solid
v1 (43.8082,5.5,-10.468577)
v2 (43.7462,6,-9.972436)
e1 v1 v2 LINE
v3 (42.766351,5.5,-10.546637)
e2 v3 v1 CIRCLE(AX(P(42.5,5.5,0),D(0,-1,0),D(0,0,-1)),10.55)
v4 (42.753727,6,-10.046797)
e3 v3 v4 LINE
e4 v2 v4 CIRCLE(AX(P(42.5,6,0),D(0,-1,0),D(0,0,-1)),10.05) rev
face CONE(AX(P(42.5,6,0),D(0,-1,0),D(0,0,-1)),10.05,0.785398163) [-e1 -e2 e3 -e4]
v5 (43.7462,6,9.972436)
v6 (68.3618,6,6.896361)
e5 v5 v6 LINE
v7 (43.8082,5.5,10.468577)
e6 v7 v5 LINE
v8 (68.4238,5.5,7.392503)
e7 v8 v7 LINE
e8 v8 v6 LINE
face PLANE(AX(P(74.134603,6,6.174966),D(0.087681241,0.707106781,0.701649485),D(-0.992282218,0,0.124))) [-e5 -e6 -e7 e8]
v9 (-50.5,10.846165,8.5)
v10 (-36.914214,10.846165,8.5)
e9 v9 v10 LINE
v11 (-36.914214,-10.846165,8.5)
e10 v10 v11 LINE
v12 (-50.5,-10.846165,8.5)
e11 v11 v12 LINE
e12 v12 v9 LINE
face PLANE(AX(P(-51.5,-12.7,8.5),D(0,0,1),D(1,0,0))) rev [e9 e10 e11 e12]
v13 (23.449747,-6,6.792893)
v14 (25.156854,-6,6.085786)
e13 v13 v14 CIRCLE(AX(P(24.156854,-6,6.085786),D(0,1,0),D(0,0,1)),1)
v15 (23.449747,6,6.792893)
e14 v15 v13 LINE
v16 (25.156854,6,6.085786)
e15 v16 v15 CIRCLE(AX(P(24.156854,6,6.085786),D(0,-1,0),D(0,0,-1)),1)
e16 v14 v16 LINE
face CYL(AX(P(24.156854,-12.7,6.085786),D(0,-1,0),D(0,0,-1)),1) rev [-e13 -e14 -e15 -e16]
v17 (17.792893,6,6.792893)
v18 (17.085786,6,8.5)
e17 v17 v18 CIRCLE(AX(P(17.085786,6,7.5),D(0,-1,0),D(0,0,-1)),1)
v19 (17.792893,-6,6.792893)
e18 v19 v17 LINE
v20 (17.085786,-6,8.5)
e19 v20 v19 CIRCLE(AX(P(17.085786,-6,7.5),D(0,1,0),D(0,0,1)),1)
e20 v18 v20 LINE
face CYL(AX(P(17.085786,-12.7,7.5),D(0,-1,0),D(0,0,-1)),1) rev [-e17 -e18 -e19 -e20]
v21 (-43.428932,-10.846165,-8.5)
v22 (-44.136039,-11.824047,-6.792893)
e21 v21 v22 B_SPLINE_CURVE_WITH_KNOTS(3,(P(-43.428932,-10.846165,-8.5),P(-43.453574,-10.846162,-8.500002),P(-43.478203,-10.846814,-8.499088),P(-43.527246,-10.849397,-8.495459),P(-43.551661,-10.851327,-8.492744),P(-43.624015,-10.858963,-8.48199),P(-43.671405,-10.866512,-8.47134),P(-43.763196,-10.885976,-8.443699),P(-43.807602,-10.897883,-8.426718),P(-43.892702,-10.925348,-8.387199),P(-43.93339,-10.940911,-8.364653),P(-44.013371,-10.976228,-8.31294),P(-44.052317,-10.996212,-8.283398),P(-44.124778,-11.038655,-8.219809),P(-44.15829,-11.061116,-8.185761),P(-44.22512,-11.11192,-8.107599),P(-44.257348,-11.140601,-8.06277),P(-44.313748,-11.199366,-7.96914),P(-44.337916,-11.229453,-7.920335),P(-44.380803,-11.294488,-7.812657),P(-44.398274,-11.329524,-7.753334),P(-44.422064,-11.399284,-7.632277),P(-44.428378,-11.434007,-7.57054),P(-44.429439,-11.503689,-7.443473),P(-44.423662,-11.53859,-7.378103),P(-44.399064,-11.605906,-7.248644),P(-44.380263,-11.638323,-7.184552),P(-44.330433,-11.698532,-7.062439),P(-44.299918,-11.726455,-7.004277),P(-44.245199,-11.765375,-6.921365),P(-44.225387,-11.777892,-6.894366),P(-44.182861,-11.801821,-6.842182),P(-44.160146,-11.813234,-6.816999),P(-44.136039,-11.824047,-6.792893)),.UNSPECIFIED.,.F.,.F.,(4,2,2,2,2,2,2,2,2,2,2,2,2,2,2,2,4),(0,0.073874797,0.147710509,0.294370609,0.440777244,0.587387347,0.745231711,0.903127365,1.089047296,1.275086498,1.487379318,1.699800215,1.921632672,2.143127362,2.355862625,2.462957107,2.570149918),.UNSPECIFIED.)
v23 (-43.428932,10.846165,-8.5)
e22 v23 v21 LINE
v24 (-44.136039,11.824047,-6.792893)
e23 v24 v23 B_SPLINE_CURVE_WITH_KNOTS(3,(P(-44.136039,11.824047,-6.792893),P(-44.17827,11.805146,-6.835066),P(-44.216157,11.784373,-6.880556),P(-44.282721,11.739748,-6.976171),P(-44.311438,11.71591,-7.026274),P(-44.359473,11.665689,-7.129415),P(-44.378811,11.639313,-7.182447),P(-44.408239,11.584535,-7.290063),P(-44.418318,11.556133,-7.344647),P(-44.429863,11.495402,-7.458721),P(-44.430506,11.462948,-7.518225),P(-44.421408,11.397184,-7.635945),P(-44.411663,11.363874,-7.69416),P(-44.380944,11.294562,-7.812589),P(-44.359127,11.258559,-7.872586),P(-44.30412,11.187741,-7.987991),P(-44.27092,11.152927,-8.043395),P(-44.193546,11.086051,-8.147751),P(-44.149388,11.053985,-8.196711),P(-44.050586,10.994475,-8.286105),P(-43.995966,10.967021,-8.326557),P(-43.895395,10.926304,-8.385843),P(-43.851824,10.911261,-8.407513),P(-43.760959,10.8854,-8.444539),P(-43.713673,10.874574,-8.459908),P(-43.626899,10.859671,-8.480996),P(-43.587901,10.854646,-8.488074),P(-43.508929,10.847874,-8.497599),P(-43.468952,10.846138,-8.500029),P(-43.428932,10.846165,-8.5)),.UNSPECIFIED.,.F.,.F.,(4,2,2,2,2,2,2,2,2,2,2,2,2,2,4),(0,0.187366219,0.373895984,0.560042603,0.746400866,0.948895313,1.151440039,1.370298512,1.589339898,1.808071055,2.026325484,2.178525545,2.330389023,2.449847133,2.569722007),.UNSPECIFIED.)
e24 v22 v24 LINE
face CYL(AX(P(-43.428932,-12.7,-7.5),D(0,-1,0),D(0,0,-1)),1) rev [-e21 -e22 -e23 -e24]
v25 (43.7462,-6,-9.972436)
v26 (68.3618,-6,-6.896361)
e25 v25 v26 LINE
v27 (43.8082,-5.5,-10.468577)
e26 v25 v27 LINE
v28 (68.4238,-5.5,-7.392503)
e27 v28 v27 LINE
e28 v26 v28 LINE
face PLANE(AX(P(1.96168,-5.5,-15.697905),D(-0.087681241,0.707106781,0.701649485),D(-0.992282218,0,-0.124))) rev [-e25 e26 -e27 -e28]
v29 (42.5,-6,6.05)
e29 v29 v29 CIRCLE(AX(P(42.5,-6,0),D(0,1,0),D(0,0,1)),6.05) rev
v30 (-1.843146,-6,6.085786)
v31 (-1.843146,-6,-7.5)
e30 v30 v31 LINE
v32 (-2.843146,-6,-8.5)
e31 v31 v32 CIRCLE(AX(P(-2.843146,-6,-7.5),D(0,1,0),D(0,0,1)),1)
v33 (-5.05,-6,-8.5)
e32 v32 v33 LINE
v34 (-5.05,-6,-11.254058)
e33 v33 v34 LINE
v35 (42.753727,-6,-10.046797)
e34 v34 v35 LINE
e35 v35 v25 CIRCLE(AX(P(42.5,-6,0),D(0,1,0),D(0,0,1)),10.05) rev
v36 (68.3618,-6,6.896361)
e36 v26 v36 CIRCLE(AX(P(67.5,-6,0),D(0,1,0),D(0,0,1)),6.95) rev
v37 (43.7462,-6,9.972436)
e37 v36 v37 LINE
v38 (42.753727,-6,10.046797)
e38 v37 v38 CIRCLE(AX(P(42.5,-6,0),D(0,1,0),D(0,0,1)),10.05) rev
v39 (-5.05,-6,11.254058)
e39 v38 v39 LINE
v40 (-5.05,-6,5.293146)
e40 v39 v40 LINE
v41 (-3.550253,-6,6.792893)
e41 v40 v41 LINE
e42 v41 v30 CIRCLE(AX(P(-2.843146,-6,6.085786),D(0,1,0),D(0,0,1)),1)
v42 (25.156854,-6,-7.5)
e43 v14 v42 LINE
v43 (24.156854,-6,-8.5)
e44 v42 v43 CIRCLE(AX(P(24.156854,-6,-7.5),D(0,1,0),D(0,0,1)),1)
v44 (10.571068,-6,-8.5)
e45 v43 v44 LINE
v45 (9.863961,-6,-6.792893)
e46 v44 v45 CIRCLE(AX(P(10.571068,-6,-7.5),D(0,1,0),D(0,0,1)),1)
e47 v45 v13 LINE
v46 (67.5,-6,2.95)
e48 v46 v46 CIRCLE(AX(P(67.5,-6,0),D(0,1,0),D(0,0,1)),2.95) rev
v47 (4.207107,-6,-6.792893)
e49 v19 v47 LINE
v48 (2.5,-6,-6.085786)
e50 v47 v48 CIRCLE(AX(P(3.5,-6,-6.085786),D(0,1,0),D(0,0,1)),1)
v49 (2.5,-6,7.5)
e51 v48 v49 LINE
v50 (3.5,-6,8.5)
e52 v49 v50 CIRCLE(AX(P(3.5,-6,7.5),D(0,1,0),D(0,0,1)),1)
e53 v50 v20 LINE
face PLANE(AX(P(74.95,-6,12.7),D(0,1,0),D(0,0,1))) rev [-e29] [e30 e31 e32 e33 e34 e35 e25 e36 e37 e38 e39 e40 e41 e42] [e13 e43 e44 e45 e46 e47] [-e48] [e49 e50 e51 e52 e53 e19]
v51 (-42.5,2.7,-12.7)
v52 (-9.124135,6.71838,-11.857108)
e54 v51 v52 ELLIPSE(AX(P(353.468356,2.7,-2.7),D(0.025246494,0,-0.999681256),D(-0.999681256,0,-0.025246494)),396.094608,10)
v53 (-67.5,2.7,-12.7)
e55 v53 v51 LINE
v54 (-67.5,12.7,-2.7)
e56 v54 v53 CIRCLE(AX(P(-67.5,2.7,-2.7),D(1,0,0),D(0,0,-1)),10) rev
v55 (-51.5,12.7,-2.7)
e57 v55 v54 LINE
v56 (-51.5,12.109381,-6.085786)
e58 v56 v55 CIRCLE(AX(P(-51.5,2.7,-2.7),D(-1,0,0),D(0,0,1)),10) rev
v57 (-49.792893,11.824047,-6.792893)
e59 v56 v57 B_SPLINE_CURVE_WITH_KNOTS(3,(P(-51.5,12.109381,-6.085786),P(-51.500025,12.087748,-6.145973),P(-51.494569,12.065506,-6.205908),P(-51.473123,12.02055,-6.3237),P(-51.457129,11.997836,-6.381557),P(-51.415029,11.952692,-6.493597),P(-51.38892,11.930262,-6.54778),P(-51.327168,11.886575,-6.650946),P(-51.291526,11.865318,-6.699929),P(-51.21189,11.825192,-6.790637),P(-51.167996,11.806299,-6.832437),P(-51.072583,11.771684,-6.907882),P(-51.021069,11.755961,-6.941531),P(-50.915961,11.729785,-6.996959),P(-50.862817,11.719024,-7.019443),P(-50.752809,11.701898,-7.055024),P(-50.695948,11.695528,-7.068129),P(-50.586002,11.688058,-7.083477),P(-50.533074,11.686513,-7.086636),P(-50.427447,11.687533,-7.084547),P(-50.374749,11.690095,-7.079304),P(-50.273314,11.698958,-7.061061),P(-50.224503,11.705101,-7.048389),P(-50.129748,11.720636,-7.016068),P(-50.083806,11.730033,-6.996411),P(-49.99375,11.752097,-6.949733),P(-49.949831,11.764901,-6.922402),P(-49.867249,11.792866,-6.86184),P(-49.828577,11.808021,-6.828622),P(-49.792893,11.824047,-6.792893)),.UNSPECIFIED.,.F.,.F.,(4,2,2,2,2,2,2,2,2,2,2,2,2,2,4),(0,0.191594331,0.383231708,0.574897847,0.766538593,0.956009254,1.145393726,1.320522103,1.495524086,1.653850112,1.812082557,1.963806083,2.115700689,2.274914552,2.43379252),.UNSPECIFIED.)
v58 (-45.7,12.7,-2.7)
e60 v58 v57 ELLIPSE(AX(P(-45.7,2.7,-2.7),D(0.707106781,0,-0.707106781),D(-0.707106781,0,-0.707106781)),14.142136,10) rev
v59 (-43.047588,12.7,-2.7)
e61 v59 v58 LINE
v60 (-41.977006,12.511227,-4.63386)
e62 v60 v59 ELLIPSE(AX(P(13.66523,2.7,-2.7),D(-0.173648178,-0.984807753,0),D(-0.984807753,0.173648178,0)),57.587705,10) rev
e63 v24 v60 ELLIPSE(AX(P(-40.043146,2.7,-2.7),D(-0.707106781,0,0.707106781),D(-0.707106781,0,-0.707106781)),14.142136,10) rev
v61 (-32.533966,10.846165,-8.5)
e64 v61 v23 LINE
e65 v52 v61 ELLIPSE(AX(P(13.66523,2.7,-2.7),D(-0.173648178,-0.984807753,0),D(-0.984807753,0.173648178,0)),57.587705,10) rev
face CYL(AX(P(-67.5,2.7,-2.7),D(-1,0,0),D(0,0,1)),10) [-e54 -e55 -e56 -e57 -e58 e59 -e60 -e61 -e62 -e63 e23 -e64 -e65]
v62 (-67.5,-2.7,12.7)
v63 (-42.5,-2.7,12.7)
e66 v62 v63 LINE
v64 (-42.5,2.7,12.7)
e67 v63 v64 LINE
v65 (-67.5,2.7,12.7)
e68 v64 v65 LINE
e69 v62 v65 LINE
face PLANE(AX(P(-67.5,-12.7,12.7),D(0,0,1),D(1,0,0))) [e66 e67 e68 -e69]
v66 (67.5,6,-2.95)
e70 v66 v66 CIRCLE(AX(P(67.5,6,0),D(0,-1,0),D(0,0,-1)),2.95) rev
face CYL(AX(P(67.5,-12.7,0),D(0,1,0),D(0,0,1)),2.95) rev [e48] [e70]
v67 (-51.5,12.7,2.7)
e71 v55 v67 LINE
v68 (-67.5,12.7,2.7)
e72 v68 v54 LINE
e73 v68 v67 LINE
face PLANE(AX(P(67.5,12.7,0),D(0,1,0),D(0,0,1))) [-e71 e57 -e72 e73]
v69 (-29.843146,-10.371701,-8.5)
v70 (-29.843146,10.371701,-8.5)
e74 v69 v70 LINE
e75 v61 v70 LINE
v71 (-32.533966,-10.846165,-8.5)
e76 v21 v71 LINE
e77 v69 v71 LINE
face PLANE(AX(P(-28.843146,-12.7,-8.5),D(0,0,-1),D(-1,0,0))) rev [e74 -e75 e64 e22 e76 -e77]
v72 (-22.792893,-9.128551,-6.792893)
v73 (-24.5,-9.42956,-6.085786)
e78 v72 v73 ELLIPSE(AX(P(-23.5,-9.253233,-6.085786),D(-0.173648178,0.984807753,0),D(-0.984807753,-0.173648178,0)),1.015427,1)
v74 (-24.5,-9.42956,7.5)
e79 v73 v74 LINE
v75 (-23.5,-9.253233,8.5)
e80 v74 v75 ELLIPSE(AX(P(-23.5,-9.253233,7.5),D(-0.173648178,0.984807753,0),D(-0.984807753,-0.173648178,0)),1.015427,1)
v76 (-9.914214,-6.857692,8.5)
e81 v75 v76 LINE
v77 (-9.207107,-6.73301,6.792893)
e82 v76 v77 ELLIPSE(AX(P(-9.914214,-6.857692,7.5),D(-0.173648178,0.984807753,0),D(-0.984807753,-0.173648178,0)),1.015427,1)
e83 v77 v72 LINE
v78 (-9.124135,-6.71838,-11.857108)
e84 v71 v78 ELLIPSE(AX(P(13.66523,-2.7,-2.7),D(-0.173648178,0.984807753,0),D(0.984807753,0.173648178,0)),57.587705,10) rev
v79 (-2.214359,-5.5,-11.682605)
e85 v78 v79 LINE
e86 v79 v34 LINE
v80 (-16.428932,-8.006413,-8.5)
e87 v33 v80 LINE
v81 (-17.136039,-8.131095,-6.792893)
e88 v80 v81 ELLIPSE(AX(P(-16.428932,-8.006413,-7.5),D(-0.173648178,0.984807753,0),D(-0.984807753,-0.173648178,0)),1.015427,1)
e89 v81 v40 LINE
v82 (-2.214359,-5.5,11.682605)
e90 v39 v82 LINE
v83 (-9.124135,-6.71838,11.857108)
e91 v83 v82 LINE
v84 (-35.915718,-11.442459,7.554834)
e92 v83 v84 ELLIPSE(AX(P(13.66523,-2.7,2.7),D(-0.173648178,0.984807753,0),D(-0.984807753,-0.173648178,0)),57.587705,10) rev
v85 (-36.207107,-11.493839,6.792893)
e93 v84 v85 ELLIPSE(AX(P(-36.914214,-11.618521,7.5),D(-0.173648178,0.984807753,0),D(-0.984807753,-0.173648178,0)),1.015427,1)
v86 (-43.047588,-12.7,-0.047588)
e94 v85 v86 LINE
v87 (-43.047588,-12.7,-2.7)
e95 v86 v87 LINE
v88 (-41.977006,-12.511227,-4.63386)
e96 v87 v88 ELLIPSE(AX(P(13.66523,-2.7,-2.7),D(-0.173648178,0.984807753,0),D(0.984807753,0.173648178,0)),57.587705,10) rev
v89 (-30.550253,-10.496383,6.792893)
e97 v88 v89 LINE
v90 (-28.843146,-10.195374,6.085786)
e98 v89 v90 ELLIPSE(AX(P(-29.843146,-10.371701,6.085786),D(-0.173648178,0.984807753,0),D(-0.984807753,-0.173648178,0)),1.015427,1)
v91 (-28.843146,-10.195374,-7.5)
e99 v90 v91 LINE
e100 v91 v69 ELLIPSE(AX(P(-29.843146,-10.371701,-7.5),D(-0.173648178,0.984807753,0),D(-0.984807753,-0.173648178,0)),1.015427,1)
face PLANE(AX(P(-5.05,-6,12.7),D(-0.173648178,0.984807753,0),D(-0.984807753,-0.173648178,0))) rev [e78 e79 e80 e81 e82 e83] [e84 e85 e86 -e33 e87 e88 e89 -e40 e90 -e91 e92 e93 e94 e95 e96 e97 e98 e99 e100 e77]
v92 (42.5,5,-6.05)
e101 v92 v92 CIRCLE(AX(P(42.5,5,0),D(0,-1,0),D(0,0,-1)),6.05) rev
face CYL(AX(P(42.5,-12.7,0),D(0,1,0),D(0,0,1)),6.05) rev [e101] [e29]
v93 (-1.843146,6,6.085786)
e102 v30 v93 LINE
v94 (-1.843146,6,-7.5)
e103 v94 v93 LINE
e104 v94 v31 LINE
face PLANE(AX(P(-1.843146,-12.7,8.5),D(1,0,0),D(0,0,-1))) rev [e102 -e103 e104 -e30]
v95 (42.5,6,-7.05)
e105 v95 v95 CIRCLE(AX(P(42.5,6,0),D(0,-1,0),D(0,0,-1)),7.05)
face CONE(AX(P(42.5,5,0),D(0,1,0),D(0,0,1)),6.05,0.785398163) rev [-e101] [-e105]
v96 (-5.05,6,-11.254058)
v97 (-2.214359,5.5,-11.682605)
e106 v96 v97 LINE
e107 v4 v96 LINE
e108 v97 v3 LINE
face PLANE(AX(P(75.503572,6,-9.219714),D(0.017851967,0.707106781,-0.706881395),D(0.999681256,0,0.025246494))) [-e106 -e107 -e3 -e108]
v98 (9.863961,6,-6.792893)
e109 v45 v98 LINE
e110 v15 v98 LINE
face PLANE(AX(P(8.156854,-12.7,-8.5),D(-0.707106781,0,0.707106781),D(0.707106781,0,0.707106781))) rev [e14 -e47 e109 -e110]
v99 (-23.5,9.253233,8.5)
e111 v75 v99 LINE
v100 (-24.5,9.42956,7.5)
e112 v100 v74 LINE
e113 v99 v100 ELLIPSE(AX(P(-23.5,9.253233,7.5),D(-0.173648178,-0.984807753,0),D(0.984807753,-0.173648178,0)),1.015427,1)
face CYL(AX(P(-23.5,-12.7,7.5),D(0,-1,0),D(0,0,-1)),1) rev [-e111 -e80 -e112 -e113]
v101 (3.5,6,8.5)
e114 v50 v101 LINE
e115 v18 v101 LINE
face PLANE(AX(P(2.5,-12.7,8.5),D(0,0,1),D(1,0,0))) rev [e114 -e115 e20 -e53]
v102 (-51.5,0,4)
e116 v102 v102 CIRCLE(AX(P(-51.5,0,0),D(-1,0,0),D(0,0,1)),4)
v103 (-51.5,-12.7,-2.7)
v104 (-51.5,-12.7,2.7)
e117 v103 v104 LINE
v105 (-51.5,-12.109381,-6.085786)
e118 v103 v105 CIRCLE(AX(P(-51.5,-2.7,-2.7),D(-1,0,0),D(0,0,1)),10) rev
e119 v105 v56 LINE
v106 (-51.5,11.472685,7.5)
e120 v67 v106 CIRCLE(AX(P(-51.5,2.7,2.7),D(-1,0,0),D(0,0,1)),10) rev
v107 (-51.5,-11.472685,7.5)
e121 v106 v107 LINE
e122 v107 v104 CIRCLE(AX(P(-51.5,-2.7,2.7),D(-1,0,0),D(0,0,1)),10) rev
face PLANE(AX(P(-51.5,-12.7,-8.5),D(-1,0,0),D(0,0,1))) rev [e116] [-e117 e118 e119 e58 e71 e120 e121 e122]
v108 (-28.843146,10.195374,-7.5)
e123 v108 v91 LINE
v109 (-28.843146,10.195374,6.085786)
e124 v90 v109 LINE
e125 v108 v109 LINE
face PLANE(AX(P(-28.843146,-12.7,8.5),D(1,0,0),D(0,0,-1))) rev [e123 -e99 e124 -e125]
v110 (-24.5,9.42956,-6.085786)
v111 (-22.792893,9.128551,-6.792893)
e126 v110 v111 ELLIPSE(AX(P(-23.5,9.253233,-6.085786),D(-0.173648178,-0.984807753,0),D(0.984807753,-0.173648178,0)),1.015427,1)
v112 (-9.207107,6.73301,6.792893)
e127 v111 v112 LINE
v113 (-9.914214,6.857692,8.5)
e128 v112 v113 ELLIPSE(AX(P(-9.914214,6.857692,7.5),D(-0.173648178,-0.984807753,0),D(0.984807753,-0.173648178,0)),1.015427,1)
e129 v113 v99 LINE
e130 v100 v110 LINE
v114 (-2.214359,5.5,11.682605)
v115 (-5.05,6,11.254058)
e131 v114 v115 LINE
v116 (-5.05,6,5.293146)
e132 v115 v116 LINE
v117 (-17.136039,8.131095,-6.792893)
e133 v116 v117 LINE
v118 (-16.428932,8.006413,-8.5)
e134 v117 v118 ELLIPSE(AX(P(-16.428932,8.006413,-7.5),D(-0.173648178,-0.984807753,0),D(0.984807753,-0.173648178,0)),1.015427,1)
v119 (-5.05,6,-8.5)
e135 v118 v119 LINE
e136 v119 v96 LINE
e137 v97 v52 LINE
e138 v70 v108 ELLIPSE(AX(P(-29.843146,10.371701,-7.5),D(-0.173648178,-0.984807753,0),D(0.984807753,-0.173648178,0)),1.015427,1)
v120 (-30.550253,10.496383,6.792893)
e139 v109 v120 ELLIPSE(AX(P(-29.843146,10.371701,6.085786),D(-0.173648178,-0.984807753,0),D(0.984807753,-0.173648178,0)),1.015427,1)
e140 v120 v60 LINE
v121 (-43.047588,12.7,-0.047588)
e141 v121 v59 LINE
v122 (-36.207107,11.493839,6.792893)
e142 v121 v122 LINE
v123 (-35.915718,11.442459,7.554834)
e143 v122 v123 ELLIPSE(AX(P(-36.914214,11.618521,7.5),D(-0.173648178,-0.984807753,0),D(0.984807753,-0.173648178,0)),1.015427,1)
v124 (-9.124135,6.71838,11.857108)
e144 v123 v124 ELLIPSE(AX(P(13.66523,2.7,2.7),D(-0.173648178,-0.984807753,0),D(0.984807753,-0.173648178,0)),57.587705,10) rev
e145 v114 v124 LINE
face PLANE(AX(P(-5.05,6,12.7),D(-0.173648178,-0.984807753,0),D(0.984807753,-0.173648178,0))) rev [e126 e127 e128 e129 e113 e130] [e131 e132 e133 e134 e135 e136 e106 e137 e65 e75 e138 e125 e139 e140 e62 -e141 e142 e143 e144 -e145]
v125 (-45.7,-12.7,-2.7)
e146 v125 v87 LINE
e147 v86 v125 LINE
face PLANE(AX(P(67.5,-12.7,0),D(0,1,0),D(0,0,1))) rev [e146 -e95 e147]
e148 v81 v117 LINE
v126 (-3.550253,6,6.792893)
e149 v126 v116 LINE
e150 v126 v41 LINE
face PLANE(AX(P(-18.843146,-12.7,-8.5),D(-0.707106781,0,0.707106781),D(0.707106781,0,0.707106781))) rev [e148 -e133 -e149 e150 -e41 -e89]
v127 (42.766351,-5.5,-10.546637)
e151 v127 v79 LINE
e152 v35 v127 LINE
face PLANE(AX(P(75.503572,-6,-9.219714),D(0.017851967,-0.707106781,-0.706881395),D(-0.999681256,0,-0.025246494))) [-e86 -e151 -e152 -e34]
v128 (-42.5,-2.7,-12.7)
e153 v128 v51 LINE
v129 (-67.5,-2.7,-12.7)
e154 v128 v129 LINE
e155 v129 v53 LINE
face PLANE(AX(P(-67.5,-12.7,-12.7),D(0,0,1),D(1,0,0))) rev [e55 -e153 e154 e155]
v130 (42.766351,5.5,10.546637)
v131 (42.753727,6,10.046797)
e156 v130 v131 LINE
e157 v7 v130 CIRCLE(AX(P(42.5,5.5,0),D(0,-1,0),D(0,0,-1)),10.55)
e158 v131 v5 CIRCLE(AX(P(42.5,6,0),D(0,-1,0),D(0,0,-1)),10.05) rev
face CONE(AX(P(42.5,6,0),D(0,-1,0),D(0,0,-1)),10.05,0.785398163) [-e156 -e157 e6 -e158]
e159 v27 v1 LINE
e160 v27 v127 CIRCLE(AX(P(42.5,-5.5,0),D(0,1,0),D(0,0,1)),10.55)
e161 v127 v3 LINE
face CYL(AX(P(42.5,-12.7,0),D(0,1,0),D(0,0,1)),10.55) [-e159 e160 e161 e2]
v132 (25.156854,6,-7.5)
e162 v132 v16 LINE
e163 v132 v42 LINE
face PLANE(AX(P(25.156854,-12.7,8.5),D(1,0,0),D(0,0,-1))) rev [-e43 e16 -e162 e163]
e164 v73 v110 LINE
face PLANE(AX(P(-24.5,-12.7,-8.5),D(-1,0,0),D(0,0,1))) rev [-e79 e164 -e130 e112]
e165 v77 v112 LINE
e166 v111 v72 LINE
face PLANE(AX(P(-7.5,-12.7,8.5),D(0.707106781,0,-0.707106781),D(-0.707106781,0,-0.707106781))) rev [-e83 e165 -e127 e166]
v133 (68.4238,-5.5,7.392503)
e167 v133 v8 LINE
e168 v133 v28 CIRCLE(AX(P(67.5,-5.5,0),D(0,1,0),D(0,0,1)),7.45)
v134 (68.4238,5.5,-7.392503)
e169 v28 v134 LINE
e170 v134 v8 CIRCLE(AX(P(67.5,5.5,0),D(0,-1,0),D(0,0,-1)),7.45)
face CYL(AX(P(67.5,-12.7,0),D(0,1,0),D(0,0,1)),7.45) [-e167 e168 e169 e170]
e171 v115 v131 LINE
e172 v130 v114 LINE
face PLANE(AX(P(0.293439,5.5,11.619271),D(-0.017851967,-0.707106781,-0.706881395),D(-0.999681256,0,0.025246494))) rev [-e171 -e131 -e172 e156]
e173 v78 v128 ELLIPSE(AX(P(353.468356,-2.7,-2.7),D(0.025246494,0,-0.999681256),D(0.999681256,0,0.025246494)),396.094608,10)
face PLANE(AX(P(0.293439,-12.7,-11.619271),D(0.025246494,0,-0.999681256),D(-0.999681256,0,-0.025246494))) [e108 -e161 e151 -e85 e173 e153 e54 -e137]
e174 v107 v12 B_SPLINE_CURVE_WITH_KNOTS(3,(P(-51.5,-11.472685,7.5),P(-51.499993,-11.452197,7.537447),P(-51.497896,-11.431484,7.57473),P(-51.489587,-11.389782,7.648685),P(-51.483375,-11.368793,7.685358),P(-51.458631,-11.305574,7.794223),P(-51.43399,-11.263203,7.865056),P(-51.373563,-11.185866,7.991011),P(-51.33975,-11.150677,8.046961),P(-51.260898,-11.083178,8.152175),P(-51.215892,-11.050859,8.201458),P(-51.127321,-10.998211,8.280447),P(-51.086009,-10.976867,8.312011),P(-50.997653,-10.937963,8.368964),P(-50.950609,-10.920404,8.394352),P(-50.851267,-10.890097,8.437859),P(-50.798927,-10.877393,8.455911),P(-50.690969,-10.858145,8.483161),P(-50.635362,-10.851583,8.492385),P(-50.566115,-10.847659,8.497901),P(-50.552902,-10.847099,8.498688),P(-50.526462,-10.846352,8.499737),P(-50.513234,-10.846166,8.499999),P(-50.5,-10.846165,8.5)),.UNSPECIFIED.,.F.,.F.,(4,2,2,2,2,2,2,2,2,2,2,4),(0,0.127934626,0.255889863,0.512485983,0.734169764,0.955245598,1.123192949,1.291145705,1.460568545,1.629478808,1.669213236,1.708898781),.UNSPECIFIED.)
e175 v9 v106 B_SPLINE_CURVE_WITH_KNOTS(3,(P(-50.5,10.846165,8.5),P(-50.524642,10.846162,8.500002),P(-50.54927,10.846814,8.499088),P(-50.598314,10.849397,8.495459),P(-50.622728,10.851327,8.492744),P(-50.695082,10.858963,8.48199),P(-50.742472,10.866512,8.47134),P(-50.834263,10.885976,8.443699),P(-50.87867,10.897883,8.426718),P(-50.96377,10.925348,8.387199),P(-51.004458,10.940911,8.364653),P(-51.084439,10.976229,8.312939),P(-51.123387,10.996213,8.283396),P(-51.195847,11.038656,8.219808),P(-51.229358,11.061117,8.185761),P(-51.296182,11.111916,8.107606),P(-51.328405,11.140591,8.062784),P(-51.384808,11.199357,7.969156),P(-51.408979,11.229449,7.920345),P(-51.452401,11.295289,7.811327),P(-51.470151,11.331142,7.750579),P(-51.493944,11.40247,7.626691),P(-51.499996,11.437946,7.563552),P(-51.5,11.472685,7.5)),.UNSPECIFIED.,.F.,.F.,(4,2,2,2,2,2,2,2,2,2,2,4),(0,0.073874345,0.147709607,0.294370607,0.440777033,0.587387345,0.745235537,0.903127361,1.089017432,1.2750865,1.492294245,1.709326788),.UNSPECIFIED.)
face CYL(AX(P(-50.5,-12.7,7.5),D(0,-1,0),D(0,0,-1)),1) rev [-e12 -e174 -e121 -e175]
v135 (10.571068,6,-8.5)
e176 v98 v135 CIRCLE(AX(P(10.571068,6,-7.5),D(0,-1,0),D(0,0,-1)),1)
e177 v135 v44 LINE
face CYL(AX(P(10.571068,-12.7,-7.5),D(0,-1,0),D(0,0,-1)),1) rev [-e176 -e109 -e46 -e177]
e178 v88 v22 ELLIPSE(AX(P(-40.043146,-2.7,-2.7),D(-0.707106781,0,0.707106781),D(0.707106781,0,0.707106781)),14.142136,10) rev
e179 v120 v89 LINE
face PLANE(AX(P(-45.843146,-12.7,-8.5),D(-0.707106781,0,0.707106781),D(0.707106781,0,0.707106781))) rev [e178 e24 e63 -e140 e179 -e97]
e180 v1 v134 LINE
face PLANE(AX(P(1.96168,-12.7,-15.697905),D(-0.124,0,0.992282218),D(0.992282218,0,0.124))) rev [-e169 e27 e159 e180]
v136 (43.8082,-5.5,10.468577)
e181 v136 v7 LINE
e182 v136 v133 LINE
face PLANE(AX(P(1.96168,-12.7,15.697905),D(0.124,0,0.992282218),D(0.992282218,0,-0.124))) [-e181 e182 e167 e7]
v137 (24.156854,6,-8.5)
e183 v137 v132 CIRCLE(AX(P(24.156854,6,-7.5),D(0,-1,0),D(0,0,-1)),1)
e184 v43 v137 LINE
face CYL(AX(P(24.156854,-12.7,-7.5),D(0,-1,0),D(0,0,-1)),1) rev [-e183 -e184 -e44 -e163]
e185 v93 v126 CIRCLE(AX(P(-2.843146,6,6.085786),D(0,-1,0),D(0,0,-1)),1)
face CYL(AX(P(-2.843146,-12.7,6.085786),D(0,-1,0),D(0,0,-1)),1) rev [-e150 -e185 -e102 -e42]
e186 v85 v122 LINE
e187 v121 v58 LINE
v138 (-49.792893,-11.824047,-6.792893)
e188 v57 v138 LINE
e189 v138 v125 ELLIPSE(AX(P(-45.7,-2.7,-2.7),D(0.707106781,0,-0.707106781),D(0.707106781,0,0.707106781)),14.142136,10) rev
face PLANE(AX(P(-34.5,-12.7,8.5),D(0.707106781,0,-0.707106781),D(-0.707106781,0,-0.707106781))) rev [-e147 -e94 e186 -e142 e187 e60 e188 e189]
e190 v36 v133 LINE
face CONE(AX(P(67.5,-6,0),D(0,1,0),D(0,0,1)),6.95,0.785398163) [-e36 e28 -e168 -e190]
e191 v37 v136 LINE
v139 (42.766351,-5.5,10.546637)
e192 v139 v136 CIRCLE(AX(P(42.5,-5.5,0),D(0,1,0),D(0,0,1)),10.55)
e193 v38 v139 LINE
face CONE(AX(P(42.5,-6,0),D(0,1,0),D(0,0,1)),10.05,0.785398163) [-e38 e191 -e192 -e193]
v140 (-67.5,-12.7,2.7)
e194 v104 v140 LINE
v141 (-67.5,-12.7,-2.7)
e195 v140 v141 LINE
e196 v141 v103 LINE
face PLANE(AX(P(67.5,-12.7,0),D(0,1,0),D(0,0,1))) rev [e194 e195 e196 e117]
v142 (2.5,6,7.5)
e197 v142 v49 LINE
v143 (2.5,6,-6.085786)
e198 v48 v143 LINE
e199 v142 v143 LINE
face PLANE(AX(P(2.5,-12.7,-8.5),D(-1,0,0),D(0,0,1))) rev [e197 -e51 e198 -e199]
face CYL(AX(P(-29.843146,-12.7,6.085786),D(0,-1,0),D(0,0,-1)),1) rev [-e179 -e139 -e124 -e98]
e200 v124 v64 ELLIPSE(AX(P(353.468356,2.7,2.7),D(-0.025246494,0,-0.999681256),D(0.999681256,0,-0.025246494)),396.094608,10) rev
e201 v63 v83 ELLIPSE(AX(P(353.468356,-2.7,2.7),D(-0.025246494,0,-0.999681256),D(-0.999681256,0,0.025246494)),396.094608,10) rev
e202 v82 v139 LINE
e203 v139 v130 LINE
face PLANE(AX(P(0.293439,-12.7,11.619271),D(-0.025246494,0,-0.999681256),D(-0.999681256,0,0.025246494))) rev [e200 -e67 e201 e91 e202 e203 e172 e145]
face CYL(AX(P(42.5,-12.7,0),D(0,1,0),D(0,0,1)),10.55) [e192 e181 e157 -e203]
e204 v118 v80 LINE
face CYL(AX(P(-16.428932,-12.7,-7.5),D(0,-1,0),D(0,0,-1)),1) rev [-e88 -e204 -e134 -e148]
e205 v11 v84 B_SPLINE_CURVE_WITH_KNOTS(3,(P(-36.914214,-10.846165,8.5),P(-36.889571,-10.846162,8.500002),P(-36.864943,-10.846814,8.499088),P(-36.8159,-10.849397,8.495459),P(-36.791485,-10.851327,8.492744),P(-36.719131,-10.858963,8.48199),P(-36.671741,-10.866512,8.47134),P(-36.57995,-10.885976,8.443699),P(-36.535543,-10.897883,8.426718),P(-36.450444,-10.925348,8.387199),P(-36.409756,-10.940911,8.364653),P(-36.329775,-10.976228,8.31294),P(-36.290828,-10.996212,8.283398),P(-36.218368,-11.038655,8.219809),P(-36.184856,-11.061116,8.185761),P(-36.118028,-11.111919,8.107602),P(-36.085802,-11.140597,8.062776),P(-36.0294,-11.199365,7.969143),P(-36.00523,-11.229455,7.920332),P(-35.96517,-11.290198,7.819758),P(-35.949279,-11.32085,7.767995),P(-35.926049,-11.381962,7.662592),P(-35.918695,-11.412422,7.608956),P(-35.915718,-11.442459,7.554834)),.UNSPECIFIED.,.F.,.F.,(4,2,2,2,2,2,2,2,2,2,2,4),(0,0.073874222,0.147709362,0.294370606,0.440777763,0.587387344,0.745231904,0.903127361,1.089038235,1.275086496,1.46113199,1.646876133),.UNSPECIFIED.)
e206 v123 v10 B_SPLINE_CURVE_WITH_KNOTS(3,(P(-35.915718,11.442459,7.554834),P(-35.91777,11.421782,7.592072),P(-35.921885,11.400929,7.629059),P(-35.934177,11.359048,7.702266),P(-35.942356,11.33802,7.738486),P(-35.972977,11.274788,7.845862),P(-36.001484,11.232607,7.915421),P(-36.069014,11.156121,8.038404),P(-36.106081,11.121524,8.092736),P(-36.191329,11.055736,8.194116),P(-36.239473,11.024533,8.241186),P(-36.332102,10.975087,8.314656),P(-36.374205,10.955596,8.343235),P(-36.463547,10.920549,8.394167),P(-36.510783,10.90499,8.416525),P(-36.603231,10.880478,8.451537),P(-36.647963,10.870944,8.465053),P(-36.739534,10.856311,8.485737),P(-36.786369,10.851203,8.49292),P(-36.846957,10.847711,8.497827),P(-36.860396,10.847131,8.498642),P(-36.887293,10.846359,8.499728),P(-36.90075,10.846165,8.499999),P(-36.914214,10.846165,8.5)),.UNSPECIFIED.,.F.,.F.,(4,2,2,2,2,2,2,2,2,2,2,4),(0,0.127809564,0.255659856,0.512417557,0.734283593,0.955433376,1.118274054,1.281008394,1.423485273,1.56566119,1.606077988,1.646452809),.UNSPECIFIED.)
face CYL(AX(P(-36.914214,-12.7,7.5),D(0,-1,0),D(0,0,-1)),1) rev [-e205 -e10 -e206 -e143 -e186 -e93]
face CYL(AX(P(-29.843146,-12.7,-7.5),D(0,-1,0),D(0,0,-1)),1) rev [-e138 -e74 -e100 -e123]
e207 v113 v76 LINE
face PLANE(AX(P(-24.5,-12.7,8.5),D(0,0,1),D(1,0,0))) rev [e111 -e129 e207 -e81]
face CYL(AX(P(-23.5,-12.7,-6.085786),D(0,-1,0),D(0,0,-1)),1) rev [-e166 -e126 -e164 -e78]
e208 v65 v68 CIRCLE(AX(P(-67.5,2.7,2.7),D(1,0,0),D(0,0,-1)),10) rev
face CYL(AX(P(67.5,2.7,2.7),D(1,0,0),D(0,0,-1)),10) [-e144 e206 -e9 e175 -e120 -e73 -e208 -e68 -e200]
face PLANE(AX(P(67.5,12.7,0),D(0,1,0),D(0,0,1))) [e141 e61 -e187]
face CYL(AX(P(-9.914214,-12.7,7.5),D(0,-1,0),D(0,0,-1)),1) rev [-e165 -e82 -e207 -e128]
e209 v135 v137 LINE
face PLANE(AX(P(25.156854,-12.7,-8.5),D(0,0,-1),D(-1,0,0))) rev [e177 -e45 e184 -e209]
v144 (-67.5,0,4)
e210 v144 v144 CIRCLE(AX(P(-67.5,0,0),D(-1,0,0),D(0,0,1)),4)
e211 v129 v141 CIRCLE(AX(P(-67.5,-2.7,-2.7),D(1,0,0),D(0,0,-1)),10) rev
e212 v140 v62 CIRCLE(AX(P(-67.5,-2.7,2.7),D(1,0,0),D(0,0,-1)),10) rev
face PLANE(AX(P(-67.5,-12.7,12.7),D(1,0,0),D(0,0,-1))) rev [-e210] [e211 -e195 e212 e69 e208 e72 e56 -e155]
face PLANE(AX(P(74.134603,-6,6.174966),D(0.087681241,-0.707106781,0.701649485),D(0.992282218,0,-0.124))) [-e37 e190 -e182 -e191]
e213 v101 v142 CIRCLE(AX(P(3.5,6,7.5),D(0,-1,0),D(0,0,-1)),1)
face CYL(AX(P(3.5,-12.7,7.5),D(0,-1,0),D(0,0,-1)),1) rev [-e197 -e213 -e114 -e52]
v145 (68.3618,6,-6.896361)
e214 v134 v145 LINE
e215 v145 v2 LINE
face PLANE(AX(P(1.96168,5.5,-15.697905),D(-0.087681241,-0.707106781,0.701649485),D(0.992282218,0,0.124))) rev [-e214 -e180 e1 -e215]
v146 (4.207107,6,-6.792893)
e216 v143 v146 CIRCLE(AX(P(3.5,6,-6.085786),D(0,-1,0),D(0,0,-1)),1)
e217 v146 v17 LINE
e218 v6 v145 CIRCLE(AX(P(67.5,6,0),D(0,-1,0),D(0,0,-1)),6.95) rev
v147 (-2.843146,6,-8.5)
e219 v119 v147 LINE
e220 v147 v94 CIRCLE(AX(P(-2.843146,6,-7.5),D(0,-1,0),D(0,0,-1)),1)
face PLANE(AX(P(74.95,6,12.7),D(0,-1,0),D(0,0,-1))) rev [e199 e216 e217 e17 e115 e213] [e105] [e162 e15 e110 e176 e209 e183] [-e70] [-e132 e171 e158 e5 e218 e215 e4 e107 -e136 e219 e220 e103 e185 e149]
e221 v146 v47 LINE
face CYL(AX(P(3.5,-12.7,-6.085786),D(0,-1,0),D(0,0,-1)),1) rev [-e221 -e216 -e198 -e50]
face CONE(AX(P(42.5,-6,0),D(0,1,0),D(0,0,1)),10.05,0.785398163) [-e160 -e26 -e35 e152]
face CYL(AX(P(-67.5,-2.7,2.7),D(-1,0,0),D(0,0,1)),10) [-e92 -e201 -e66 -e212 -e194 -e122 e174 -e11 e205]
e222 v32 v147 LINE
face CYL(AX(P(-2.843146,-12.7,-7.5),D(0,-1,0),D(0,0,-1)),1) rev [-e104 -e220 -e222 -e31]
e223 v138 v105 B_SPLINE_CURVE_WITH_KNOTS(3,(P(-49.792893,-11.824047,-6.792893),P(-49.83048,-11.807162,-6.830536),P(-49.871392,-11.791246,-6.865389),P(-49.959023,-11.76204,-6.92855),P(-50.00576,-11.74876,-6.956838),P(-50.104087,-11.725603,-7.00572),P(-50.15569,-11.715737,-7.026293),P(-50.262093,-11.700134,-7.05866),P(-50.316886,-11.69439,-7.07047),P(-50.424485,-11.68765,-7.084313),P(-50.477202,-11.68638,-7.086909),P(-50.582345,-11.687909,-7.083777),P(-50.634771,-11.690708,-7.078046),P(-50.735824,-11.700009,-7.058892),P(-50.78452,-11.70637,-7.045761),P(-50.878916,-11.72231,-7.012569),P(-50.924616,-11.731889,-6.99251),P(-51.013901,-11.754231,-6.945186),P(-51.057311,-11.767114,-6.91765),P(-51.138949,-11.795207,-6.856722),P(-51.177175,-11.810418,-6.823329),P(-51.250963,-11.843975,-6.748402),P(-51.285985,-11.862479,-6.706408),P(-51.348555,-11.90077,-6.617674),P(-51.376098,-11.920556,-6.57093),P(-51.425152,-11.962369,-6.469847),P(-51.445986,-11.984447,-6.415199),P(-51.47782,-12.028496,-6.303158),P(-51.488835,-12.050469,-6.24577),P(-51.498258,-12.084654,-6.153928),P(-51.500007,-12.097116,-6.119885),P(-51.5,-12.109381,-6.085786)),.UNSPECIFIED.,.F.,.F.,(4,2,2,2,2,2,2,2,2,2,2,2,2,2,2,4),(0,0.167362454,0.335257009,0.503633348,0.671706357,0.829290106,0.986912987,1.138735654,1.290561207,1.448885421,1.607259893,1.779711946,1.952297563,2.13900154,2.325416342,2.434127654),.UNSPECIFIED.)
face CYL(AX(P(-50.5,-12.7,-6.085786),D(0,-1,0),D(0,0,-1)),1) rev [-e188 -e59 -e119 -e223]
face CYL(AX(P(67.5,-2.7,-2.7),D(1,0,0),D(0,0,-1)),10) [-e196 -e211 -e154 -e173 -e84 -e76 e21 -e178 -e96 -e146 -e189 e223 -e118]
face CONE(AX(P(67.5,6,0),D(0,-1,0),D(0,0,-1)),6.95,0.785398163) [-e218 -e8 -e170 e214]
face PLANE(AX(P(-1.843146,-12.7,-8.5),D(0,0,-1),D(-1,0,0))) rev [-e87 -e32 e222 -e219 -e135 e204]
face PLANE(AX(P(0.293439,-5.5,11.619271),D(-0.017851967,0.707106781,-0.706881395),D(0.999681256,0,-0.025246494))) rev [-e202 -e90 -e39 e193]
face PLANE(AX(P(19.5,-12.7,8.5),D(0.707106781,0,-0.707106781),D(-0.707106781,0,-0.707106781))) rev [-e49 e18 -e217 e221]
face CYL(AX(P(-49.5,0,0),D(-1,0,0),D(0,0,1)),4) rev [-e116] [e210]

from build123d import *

# Parameters (mm, degrees)
BOSS_EXTRUDE1_DEPTH      = 12.7
BOSS_EXTRUDE1_DEPTH_BACK = 12.7
SKETCH1_R                = 2.95
SKETCH1_R_2              = 6.05
CUT_EXTRUDE4_DEPTH       = 86.079315935
CUT_EXTRUDE1_DEPTH       = 81.149563318
FILLET8_R                = 10
CUT_EXTRUDE5_DEPTH       = 81.149563318
FILLET9_R                = 1
LPATTERN1_COUNT          = 3
LPATTERN1_PITCH          = 27
FILLET9_OF_LPATTERN1_R   = 1
CHAMFER2_SIZE            = 0.5
SKETCH8_R                = 4
CUT_EXTRUDE6_DEPTH       = 18
CHAMFER3_SIZE            = 1


with BuildPart() as part:
    # Sketch1 → Boss-Extrude1 (new, two sides: drawn at the far end of the back side and taken through both)
    with BuildSketch(Plane(origin=(0, 0, 0), x_dir=(1, 0, 0), z_dir=(0, 1, 0)).offset(-BOSS_EXTRUDE1_DEPTH_BACK)):
        with BuildLine():
            Line((-67.5, -12.7), (67.5, -12.7))
            ThreePointArc((67.5, -12.7), (80.2, 0), (67.5, 12.7))
            Line((67.5, 12.7), (-67.5, 12.7))
            Line((-67.5, 12.7), (-67.5, -12.7))
        make_face()
        with Locations(Location((67.5, 0, 0), (0, 0, 270))):
            Circle(SKETCH1_R, mode=Mode.SUBTRACT)
        with Locations(Location((42.5, 0, 0), (0, 0, 270))):
            Circle(SKETCH1_R_2, mode=Mode.SUBTRACT)
    extrude(amount=BOSS_EXTRUDE1_DEPTH + BOSS_EXTRUDE1_DEPTH_BACK)

    # Sketch6 → Cut-Extrude4 (cut, through all)
    with BuildSketch(Plane(origin=(0, 12.7, 0), x_dir=(1, 0, 0), z_dir=(0, 1, 0))):
        with BuildLine():
            Line((68.4238, -7.392502524), (43.8082, -10.468577399))
            ThreePointArc((43.8082, -10.468577399), (43.288242133, -10.520512076), (42.766350508, -10.546637256))
            Line((42.766350508, -10.546637256), (-42.5, -12.7))
            Line((-42.5, -12.7), (67.5, -12.7))
            ThreePointArc((67.5, -12.7), (80.2, 0), (67.5, 12.7))
            Line((67.5, 12.7), (-42.5, 12.7))
            Line((-42.5, 12.7), (42.766350508, 10.546637256))
            ThreePointArc((42.766350508, 10.546637256), (43.288242133, 10.520512076), (43.8082, 10.468577399))
            Line((43.8082, 10.468577399), (68.4238, 7.392502524))
            ThreePointArc((68.4238, 7.392502524), (73.085016115, 4.930526848), (74.95, 0))
            ThreePointArc((74.95, 0), (73.085016115, -4.930526848), (68.4238, -7.392502524))
        make_face()
    extrude(amount=-CUT_EXTRUDE4_DEPTH, mode=Mode.SUBTRACT)

    # Sketch2 → Cut-Extrude1 (cut, through all)
    with BuildSketch(Plane(origin=(0, 0, -12.7), x_dir=(-1, 0, 0), z_dir=(0, 0, -1))):
        Polygon((-74.95, 12.7), (43.047588191, 12.7), (5.05, 6), (-74.95, 6), align=None)
        Polygon((-74.95, -12.7), (43.047588191, -12.7), (5.05, -6), (-74.95, -6), align=None)
    extrude(amount=-CUT_EXTRUDE1_DEPTH, mode=Mode.SUBTRACT)

    # Fillet8
    # the kernel refuses this fillet: 10 mm, written as the material it takes off along each edge
    with BuildSketch(Plane(origin=(-127.5, -12.7, 12.7), x_dir=(0, 1, 0), z_dir=(1, 0, 0)), Plane(origin=(16.952411809, -12.7, -12.7), x_dir=(0, 1, 0), z_dir=(-1, 0, 0))) as fillet8_piece_1:
        with BuildLine():
            CenterArc((FILLET8_R, -FILLET8_R), FILLET8_R, 90, 90)
            Line((0, -FILLET8_R), (-FILLET8_R * 0.02, -FILLET8_R))
            Line((-FILLET8_R * 0.02, -FILLET8_R), (-FILLET8_R * 0.02, FILLET8_R * 0.02))
            Line((-FILLET8_R * 0.02, FILLET8_R * 0.02), (FILLET8_R, FILLET8_R * 0.02))
            Line((FILLET8_R, FILLET8_R * 0.02), (FILLET8_R, 0))
        make_face()
    extrude(amount=144.452411809, mode=Mode.SUBTRACT)
    with BuildSketch(Plane(origin=(-127.5, 12.7, 12.7), x_dir=(0, -1, 0), z_dir=(1, 0, 0)), Plane(origin=(16.952411809, 12.7, -12.7), x_dir=(0, -1, 0), z_dir=(-1, 0, 0))) as fillet8_piece_2:
        with BuildLine():
            CenterArc((FILLET8_R, FILLET8_R), FILLET8_R, 180, 90)
            Line((0, FILLET8_R), (-FILLET8_R * 0.02, FILLET8_R))
            Line((-FILLET8_R * 0.02, FILLET8_R), (-FILLET8_R * 0.02, -FILLET8_R * 0.02))
            Line((-FILLET8_R * 0.02, -FILLET8_R * 0.02), (FILLET8_R, -FILLET8_R * 0.02))
            Line((FILLET8_R, -FILLET8_R * 0.02), (FILLET8_R, 0))
        make_face()
    extrude(amount=144.452411809, mode=Mode.SUBTRACT)

    # Sketch7 → Cut-Extrude5 (cut, through all)
    with BuildSketch(Plane(origin=(0, 12.7, 0), x_dir=(1, 0, 0), z_dir=(0, 1, 0))):
        Polygon((-51.5, 8.5), (-51.5, -8.5), (-34.5, -8.5), align=None)
        Polygon((-45.843145751, 8.5), (-28.843145751, -8.5), (-28.843145751, 8.5), align=None)
    cut_extrude5 = extrude(amount=-CUT_EXTRUDE5_DEPTH, mode=Mode.SUBTRACT)

    # Fillet9
    fillet9_edges = [part.edges().sort_by_distance(p)[0] for p in [
        (-28.843145751, 0, -8.5),
        (-45.843145751, 0, -8.5),
        (-28.843145751, 0, 8.5),
        (-34.5, 0, 8.5),
        (-51.5, 0, -8.5),
        (-51.5, 0, 8.5),
    ]]
    fillet(fillet9_edges, radius=FILLET9_R)

    # LPattern1: Cut-Extrude5 ×3
    with Locations(*[(i * LPATTERN1_PITCH, 0, 0) for i in range(1, LPATTERN1_COUNT)]):
        add(cut_extrude5, mode=Mode.SUBTRACT)

    # Fillet9 of LPattern1
    fillet9_of_lpattern1_edges = [part.edges().sort_by_distance(p)[0] for p in [
        (-1.843145751, 0, -8.5),
        (-18.843145751, 0, -8.5),
        (-1.843145751, 0, 8.5),
        (-7.5, 0, 8.5),
        (-24.5, 0, -8.5),
        (-24.5, 0, 8.5),
        (25.156854249, 0, -8.5),
        (8.156854249, 0, -8.5),
        (25.156854249, 0, 8.5),
        (19.5, 0, 8.5),
        (2.5, 0, -8.5),
        (2.5, 0, 8.5),
    ]]
    fillet(fillet9_of_lpattern1_edges, radius=FILLET9_OF_LPATTERN1_R)

    # Chamfer2
    chamfer2_edges = [part.edges().sort_by_distance(p)[0] for p in [
        (18.858175254, -6, 11.150427304),
        (56.116, -6, -8.930539961),
        (18.858175254, -6, -11.150427304),
        (43.288242133, -6, -10.520512076),
        (74.95, -6, 0),
        (43.288242133, -6, 10.520512076),
        (56.116, -6, 8.930539961),
        (56.116, 6, 8.930539961),
        (56.116, 6, -8.930539961),
        (18.858175254, 6, 11.150427304),
        (43.288242133, 6, -10.520512076),
        (18.858175254, 6, -11.150427304),
        (74.95, 6, 0),
        (43.288242133, 6, 10.520512076),
    ]]
    chamfer(chamfer2_edges, length=CHAMFER2_SIZE)

    # Sketch8 → Cut-Extrude6 (cut)
    with BuildSketch(Plane.ZY.offset(67.5)):
        Circle(SKETCH8_R)
    extrude(amount=-CUT_EXTRUDE6_DEPTH, mode=Mode.SUBTRACT)

    # Chamfer3
    chamfer3_edges = [part.edges().sort_by_distance(p)[0] for p in [
        (42.5, 6, -6.05),
    ]]
    chamfer(chamfer3_edges, length=CHAMFER3_SIZE)


solid = part.part
